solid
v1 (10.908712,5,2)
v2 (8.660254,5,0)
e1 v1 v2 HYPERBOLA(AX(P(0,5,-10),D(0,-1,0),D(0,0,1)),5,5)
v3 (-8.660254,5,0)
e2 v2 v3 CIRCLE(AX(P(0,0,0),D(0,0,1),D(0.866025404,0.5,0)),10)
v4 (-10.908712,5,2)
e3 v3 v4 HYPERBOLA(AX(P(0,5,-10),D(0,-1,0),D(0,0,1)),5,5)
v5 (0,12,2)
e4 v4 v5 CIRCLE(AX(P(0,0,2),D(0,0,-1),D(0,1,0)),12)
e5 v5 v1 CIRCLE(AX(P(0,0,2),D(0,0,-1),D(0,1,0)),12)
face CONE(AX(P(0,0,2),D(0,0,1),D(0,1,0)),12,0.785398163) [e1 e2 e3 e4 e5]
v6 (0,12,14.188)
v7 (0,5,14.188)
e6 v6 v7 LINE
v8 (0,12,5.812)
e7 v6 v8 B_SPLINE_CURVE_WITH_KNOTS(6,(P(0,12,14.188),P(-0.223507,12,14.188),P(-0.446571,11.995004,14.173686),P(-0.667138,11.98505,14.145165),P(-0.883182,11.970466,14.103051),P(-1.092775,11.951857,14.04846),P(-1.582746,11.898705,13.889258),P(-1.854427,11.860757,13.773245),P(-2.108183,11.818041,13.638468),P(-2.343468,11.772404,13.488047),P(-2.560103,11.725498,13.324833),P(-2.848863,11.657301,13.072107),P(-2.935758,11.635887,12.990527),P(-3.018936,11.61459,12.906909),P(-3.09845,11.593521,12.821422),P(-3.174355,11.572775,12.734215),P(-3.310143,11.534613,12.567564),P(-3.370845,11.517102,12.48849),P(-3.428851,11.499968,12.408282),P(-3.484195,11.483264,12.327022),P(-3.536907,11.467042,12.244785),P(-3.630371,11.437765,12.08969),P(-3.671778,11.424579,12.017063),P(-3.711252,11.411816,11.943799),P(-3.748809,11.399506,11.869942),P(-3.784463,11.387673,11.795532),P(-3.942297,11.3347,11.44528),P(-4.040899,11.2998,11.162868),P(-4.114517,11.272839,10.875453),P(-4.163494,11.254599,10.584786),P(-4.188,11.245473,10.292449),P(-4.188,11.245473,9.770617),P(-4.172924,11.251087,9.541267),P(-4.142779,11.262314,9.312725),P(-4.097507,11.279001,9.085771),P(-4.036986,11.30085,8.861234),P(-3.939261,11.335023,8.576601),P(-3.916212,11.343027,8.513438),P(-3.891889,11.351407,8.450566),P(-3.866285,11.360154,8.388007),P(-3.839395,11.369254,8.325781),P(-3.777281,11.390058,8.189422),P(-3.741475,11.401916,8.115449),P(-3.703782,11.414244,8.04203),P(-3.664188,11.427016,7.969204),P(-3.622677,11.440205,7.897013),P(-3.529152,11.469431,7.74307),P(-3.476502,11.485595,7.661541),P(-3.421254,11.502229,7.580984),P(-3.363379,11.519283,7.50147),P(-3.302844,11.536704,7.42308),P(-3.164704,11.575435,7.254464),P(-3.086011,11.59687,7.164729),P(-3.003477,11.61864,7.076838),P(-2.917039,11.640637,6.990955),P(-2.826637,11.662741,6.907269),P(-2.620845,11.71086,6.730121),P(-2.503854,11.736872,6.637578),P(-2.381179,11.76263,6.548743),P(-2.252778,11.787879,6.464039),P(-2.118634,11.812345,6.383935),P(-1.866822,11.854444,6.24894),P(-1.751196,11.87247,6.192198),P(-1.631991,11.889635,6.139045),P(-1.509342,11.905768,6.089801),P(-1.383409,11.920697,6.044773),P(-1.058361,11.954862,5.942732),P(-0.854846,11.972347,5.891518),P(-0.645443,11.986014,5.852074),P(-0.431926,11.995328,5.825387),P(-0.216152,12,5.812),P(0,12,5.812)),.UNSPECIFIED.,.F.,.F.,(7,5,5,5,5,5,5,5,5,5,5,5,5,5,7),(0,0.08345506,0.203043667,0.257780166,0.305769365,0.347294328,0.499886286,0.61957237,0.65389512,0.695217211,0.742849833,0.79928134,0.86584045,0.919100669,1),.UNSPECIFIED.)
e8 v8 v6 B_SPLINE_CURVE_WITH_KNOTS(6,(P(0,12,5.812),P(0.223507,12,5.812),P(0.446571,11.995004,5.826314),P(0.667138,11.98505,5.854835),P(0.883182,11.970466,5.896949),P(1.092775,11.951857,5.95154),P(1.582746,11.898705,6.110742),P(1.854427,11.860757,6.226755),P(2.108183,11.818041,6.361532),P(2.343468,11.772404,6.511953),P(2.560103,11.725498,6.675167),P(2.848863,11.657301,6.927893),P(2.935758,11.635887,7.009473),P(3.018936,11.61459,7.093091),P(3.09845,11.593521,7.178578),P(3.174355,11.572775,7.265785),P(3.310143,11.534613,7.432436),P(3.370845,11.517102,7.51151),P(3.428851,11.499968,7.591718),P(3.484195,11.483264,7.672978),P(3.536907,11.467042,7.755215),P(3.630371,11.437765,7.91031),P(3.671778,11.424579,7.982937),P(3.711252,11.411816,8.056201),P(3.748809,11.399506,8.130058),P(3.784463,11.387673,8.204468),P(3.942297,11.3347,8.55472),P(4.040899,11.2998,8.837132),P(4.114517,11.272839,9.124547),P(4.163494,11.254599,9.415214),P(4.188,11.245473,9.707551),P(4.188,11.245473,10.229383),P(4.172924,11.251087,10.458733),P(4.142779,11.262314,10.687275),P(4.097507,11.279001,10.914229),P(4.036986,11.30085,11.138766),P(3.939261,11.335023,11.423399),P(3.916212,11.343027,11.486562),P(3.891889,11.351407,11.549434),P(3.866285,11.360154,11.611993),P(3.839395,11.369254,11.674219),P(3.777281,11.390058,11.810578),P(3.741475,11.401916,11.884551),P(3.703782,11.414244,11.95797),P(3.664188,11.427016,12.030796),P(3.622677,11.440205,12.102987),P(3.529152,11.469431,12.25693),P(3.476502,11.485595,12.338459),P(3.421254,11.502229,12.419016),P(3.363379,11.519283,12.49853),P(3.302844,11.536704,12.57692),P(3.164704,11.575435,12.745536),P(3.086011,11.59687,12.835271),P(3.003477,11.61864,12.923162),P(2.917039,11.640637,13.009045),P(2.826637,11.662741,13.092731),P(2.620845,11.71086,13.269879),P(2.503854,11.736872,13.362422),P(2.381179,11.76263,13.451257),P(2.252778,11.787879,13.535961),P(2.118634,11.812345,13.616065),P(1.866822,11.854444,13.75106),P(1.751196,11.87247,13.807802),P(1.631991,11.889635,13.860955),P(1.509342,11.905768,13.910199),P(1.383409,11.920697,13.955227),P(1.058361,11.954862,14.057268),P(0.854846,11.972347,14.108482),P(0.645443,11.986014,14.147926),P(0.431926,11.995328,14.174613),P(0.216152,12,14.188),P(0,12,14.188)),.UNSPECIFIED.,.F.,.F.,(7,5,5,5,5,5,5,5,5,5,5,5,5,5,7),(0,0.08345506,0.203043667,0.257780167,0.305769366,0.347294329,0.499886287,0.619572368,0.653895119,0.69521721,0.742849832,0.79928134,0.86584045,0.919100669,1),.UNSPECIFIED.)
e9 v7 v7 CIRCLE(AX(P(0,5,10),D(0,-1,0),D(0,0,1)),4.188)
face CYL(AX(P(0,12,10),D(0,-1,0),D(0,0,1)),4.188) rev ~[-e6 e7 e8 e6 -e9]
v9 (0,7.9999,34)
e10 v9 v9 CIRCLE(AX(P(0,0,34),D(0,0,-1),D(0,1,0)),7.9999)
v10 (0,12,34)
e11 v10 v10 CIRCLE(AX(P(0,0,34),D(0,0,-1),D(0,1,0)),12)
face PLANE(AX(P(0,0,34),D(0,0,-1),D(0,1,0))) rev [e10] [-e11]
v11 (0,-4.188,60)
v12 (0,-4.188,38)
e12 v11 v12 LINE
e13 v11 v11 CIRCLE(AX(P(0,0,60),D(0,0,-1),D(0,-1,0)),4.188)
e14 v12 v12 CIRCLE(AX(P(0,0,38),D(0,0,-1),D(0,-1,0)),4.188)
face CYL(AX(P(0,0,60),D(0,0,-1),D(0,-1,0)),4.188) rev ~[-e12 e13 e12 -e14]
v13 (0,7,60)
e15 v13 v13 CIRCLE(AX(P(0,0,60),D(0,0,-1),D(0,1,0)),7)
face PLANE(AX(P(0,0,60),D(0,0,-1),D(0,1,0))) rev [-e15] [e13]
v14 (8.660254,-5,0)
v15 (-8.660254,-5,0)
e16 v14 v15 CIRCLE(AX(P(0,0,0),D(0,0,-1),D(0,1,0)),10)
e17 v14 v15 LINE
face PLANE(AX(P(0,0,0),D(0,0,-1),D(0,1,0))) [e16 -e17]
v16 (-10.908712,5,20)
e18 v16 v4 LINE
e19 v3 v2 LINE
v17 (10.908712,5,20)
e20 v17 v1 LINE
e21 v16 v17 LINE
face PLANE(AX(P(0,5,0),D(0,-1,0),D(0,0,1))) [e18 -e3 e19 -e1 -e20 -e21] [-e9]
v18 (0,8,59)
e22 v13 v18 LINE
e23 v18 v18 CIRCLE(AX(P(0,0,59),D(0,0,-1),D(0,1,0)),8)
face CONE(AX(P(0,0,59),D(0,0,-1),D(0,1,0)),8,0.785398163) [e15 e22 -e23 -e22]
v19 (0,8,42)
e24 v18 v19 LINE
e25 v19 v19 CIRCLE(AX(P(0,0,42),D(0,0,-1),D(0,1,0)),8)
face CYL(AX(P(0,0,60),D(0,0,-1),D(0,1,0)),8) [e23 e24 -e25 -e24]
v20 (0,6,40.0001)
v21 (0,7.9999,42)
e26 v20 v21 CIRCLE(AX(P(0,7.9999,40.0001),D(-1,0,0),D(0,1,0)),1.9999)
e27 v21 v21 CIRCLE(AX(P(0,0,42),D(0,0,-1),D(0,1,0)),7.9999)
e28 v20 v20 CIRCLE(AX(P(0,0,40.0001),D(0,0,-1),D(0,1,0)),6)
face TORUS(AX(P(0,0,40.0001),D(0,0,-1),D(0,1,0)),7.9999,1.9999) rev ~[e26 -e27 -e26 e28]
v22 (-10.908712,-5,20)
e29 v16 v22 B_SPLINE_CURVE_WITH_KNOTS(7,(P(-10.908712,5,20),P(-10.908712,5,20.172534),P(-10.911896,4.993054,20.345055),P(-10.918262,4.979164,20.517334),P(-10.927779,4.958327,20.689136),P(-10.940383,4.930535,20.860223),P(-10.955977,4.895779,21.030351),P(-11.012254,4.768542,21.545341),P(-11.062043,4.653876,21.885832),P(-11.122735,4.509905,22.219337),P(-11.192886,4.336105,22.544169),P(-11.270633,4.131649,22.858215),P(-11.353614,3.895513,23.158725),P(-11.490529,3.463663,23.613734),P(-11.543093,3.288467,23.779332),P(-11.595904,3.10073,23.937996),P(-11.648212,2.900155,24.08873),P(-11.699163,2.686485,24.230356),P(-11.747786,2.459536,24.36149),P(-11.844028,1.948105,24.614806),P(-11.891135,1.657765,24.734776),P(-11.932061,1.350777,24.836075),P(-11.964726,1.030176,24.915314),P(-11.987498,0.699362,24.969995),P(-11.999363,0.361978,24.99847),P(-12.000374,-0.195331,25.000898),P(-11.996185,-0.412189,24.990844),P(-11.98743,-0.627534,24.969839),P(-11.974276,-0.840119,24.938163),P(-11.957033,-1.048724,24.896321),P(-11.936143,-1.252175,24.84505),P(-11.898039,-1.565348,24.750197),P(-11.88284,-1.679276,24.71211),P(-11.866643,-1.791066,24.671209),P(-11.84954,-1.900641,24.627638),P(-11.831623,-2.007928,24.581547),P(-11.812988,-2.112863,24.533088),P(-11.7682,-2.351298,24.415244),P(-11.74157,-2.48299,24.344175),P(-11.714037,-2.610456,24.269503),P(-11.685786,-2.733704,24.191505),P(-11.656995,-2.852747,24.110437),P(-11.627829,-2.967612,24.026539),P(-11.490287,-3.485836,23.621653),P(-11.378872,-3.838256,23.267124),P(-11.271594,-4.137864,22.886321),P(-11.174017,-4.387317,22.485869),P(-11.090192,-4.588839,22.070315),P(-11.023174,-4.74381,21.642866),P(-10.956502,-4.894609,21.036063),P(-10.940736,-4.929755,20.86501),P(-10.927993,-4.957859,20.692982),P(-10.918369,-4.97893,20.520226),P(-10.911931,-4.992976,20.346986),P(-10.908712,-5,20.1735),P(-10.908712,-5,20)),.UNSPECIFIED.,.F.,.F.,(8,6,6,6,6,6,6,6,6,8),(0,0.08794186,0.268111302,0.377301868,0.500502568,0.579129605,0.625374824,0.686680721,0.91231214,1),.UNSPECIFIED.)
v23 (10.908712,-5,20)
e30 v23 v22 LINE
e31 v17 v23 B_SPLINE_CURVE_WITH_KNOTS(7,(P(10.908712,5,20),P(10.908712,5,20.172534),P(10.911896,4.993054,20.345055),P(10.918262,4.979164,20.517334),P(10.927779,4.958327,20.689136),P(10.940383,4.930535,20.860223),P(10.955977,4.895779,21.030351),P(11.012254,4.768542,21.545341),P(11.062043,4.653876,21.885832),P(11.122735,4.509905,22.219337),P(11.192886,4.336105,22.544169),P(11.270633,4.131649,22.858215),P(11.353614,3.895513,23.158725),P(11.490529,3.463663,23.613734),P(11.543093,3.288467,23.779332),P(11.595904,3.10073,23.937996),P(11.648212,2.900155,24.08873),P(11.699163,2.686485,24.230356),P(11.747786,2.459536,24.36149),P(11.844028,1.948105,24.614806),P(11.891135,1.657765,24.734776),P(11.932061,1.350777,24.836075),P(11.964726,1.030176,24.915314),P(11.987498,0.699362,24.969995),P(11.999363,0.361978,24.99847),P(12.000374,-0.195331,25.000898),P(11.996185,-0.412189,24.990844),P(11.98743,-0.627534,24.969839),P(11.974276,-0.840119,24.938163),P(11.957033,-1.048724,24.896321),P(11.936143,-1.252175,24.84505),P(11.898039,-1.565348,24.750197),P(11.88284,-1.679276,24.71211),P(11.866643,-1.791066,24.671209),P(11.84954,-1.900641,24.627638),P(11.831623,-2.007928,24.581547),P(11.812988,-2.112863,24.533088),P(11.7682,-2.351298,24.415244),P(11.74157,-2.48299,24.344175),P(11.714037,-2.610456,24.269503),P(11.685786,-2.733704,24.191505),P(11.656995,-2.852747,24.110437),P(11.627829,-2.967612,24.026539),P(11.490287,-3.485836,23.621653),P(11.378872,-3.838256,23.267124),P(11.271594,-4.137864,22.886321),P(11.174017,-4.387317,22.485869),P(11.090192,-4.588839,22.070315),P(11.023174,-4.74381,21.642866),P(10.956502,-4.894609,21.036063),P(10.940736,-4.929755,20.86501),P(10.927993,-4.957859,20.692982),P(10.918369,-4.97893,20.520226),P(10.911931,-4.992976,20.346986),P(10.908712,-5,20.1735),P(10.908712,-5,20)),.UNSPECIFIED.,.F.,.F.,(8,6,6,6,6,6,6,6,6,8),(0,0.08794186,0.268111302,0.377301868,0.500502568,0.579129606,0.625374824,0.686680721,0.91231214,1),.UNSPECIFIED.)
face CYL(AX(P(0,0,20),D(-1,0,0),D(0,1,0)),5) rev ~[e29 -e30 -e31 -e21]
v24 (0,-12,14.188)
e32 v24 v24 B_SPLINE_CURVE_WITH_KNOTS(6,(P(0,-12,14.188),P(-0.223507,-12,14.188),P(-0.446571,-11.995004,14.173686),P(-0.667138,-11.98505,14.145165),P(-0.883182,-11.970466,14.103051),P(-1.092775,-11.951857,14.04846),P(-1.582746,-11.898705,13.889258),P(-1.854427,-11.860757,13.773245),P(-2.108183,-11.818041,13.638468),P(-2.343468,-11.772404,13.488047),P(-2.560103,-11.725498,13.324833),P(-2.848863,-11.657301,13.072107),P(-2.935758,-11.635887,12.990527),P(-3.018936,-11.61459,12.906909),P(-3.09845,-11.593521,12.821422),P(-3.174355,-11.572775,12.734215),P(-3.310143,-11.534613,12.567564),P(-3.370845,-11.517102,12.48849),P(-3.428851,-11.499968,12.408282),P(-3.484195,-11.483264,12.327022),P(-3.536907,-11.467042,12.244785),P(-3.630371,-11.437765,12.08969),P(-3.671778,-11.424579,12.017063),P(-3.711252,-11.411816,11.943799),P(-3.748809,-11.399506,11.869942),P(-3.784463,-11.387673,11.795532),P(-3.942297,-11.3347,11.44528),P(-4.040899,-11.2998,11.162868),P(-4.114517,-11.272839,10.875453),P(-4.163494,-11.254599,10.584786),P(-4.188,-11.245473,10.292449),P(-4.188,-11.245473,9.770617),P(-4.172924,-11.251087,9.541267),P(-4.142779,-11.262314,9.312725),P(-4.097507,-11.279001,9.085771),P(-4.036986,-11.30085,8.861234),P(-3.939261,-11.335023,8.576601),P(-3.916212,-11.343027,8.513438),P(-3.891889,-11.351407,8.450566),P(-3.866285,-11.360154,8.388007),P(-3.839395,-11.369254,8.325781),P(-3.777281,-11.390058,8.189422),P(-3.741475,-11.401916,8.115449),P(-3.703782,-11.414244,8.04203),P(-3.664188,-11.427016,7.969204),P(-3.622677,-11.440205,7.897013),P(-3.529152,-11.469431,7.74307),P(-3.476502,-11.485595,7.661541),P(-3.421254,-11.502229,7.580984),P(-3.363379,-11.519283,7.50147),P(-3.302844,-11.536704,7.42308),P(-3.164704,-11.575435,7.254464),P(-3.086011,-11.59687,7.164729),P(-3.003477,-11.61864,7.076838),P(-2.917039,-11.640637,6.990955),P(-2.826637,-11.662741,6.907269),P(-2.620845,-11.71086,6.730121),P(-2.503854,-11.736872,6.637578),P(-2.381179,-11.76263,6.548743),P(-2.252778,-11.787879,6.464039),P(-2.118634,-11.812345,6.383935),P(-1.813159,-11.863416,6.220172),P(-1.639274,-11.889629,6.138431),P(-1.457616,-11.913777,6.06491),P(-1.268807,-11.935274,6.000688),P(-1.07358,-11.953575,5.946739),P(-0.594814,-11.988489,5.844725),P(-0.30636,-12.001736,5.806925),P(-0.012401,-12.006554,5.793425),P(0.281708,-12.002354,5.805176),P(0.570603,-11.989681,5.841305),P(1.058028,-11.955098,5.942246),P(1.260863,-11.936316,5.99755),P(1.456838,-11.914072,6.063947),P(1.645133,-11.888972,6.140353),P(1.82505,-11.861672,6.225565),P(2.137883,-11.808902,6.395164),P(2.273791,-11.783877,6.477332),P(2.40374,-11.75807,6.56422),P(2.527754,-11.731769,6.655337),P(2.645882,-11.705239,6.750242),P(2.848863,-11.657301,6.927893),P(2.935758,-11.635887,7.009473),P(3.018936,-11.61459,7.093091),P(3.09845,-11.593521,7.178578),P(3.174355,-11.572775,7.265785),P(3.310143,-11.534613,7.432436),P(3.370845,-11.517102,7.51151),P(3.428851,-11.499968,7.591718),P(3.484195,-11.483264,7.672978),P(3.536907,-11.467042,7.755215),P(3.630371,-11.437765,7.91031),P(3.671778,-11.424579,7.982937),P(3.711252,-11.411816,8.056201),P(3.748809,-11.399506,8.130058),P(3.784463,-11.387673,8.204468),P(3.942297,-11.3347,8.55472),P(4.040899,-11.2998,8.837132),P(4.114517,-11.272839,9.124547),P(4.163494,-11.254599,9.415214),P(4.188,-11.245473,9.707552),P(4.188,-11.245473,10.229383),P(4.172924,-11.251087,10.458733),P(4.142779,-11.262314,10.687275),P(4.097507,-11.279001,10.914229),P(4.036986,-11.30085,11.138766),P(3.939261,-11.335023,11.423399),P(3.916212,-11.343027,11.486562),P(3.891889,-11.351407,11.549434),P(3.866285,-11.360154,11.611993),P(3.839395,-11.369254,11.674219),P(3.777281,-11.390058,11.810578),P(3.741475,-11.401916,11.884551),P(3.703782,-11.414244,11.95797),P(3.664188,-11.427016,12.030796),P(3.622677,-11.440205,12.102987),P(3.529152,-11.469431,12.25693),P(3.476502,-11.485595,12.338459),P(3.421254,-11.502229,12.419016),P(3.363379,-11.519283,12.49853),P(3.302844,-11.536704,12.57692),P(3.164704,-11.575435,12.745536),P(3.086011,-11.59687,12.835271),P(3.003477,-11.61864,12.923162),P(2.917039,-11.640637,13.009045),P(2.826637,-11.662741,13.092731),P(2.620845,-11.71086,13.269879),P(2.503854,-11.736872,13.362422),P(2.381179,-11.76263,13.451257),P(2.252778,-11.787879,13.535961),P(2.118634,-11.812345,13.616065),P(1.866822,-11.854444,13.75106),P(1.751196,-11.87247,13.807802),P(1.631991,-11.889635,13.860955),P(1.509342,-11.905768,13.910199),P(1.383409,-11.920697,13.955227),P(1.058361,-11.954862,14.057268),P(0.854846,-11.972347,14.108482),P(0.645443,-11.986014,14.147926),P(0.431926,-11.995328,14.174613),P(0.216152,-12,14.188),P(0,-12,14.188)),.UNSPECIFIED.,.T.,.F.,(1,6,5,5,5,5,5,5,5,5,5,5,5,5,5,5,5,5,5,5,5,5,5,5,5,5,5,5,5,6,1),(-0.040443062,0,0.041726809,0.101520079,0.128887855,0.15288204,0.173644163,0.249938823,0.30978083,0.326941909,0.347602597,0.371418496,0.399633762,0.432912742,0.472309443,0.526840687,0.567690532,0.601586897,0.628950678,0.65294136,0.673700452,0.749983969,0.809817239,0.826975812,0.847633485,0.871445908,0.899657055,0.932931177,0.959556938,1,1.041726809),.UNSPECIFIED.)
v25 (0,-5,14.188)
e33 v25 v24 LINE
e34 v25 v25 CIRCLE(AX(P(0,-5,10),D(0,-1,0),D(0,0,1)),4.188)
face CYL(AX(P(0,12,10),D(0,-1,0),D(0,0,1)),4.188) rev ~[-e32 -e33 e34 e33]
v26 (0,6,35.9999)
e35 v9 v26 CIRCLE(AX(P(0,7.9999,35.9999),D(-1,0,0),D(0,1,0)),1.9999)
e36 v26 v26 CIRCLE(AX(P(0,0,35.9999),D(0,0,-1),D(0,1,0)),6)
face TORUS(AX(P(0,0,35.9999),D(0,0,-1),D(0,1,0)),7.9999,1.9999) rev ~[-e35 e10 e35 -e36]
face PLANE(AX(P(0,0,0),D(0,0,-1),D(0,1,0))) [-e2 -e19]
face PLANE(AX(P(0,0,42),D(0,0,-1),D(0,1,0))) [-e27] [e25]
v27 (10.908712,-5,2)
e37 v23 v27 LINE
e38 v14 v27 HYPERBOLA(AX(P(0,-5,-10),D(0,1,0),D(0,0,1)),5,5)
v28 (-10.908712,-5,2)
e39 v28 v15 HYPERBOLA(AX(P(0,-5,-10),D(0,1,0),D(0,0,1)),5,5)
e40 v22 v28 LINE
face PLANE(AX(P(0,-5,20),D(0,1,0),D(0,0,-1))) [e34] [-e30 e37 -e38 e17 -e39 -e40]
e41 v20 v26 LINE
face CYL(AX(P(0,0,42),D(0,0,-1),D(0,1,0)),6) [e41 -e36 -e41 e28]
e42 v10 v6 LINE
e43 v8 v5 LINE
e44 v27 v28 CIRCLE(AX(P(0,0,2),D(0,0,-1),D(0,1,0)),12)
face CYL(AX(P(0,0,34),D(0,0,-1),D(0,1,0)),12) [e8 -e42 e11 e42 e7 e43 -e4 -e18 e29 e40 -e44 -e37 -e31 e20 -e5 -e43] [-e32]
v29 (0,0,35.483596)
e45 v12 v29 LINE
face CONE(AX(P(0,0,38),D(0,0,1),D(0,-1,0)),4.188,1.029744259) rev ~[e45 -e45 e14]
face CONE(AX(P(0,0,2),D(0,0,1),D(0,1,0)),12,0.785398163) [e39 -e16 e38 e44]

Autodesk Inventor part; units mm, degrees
ref_plane "XZ Plane" through (0, 0, 0) normal (0, 1, 0) x (-1, 0, 0)
ref_plane "XY Plane" through (0, 0, 0) normal (0, 0, 1) x (1, 0, 0)
sketch "Sketch1" plane through (0, 0, 0) normal (1, 0, 0) x (0, 1, 0)
  line L0 (0, 67.4997) -> (0, -67.4997)
  line L1 (0, 60) -> (8, 60)
  line L2 (8, 60) -> (8, 42)
  line L3 (8, 42) -> (6, 42)
  line L4 (6, 42) -> (6, 34)
  line L5 (6, 34) -> (12, 34)
  line L6 (12, 34) -> (12, 0)
  line L7 (12, 0) -> (0, 0)
  dimension "d0" = 24
  dimension "d1" = 60
  dimension "d2" = 18
  dimension "d3" = 16
  dimension "d4" = 12
  dimension "d5" = 26
revolve "Revolution1" add sketch "Sketch1" angle 360 about axis through (0, 0, 67.4997) along (0, 0, -1)
chamfer "Chamfer1" distance 1 angle 45 1 edges at (0, -8, 60)
chamfer "Chamfer2" distance 2 angle 45 1 edges at (0, -12, 0)
fillet "Fillet1" radius 2 2 edges at (0, -6, 42) (0, -6, 34)
sketch "Sketch2" plane through (0, 0, 60) normal (0, 0, 1) x (1, 0, 0)
  circle A0 centre (0, 0) radius 7 projected
  point P0 (0, 0)
hole "Hole1" at (0, 0, 60) direction (0, 0, -1) diameter 8.376 depth 22 tip angle 118 thread size "M10x1.5" class "6H" standard "ISO Metric profile"
sketch "Sketch3" plane through (0, 0, 0) normal (1, 0, 0) x (0, 1, 0)
  line L0 (10, 0) -> (-10, 0) projected
  line L1 (5, 0) -> (5, 20)
  arc A0 (5, 20) -> (-5, 20) centre (0, 20) ccw
  line L2 (-5, 20) -> (-5, 0)
  line L3 (-5, 0) -> (5, 0)
  point P0 (0, 0)
  dimension "d21" = 10
  dimension "d22" = 20
extrude "Extrusion1" cut sketch "Sketch3" along normal through all both and the other way through all
hole "Hole3" at (0, 12, 10) direction (0, -1, 0) diameter 8.376 end through all thread size "M10x1.5" class "6H" standard "ISO Metric profile"
ref_plane "Work Plane2" through (0, 0, 10) normal (0, 0, -1) x (-1, 0, 0)
equation "\"d38\" = 0.5 * d5"
